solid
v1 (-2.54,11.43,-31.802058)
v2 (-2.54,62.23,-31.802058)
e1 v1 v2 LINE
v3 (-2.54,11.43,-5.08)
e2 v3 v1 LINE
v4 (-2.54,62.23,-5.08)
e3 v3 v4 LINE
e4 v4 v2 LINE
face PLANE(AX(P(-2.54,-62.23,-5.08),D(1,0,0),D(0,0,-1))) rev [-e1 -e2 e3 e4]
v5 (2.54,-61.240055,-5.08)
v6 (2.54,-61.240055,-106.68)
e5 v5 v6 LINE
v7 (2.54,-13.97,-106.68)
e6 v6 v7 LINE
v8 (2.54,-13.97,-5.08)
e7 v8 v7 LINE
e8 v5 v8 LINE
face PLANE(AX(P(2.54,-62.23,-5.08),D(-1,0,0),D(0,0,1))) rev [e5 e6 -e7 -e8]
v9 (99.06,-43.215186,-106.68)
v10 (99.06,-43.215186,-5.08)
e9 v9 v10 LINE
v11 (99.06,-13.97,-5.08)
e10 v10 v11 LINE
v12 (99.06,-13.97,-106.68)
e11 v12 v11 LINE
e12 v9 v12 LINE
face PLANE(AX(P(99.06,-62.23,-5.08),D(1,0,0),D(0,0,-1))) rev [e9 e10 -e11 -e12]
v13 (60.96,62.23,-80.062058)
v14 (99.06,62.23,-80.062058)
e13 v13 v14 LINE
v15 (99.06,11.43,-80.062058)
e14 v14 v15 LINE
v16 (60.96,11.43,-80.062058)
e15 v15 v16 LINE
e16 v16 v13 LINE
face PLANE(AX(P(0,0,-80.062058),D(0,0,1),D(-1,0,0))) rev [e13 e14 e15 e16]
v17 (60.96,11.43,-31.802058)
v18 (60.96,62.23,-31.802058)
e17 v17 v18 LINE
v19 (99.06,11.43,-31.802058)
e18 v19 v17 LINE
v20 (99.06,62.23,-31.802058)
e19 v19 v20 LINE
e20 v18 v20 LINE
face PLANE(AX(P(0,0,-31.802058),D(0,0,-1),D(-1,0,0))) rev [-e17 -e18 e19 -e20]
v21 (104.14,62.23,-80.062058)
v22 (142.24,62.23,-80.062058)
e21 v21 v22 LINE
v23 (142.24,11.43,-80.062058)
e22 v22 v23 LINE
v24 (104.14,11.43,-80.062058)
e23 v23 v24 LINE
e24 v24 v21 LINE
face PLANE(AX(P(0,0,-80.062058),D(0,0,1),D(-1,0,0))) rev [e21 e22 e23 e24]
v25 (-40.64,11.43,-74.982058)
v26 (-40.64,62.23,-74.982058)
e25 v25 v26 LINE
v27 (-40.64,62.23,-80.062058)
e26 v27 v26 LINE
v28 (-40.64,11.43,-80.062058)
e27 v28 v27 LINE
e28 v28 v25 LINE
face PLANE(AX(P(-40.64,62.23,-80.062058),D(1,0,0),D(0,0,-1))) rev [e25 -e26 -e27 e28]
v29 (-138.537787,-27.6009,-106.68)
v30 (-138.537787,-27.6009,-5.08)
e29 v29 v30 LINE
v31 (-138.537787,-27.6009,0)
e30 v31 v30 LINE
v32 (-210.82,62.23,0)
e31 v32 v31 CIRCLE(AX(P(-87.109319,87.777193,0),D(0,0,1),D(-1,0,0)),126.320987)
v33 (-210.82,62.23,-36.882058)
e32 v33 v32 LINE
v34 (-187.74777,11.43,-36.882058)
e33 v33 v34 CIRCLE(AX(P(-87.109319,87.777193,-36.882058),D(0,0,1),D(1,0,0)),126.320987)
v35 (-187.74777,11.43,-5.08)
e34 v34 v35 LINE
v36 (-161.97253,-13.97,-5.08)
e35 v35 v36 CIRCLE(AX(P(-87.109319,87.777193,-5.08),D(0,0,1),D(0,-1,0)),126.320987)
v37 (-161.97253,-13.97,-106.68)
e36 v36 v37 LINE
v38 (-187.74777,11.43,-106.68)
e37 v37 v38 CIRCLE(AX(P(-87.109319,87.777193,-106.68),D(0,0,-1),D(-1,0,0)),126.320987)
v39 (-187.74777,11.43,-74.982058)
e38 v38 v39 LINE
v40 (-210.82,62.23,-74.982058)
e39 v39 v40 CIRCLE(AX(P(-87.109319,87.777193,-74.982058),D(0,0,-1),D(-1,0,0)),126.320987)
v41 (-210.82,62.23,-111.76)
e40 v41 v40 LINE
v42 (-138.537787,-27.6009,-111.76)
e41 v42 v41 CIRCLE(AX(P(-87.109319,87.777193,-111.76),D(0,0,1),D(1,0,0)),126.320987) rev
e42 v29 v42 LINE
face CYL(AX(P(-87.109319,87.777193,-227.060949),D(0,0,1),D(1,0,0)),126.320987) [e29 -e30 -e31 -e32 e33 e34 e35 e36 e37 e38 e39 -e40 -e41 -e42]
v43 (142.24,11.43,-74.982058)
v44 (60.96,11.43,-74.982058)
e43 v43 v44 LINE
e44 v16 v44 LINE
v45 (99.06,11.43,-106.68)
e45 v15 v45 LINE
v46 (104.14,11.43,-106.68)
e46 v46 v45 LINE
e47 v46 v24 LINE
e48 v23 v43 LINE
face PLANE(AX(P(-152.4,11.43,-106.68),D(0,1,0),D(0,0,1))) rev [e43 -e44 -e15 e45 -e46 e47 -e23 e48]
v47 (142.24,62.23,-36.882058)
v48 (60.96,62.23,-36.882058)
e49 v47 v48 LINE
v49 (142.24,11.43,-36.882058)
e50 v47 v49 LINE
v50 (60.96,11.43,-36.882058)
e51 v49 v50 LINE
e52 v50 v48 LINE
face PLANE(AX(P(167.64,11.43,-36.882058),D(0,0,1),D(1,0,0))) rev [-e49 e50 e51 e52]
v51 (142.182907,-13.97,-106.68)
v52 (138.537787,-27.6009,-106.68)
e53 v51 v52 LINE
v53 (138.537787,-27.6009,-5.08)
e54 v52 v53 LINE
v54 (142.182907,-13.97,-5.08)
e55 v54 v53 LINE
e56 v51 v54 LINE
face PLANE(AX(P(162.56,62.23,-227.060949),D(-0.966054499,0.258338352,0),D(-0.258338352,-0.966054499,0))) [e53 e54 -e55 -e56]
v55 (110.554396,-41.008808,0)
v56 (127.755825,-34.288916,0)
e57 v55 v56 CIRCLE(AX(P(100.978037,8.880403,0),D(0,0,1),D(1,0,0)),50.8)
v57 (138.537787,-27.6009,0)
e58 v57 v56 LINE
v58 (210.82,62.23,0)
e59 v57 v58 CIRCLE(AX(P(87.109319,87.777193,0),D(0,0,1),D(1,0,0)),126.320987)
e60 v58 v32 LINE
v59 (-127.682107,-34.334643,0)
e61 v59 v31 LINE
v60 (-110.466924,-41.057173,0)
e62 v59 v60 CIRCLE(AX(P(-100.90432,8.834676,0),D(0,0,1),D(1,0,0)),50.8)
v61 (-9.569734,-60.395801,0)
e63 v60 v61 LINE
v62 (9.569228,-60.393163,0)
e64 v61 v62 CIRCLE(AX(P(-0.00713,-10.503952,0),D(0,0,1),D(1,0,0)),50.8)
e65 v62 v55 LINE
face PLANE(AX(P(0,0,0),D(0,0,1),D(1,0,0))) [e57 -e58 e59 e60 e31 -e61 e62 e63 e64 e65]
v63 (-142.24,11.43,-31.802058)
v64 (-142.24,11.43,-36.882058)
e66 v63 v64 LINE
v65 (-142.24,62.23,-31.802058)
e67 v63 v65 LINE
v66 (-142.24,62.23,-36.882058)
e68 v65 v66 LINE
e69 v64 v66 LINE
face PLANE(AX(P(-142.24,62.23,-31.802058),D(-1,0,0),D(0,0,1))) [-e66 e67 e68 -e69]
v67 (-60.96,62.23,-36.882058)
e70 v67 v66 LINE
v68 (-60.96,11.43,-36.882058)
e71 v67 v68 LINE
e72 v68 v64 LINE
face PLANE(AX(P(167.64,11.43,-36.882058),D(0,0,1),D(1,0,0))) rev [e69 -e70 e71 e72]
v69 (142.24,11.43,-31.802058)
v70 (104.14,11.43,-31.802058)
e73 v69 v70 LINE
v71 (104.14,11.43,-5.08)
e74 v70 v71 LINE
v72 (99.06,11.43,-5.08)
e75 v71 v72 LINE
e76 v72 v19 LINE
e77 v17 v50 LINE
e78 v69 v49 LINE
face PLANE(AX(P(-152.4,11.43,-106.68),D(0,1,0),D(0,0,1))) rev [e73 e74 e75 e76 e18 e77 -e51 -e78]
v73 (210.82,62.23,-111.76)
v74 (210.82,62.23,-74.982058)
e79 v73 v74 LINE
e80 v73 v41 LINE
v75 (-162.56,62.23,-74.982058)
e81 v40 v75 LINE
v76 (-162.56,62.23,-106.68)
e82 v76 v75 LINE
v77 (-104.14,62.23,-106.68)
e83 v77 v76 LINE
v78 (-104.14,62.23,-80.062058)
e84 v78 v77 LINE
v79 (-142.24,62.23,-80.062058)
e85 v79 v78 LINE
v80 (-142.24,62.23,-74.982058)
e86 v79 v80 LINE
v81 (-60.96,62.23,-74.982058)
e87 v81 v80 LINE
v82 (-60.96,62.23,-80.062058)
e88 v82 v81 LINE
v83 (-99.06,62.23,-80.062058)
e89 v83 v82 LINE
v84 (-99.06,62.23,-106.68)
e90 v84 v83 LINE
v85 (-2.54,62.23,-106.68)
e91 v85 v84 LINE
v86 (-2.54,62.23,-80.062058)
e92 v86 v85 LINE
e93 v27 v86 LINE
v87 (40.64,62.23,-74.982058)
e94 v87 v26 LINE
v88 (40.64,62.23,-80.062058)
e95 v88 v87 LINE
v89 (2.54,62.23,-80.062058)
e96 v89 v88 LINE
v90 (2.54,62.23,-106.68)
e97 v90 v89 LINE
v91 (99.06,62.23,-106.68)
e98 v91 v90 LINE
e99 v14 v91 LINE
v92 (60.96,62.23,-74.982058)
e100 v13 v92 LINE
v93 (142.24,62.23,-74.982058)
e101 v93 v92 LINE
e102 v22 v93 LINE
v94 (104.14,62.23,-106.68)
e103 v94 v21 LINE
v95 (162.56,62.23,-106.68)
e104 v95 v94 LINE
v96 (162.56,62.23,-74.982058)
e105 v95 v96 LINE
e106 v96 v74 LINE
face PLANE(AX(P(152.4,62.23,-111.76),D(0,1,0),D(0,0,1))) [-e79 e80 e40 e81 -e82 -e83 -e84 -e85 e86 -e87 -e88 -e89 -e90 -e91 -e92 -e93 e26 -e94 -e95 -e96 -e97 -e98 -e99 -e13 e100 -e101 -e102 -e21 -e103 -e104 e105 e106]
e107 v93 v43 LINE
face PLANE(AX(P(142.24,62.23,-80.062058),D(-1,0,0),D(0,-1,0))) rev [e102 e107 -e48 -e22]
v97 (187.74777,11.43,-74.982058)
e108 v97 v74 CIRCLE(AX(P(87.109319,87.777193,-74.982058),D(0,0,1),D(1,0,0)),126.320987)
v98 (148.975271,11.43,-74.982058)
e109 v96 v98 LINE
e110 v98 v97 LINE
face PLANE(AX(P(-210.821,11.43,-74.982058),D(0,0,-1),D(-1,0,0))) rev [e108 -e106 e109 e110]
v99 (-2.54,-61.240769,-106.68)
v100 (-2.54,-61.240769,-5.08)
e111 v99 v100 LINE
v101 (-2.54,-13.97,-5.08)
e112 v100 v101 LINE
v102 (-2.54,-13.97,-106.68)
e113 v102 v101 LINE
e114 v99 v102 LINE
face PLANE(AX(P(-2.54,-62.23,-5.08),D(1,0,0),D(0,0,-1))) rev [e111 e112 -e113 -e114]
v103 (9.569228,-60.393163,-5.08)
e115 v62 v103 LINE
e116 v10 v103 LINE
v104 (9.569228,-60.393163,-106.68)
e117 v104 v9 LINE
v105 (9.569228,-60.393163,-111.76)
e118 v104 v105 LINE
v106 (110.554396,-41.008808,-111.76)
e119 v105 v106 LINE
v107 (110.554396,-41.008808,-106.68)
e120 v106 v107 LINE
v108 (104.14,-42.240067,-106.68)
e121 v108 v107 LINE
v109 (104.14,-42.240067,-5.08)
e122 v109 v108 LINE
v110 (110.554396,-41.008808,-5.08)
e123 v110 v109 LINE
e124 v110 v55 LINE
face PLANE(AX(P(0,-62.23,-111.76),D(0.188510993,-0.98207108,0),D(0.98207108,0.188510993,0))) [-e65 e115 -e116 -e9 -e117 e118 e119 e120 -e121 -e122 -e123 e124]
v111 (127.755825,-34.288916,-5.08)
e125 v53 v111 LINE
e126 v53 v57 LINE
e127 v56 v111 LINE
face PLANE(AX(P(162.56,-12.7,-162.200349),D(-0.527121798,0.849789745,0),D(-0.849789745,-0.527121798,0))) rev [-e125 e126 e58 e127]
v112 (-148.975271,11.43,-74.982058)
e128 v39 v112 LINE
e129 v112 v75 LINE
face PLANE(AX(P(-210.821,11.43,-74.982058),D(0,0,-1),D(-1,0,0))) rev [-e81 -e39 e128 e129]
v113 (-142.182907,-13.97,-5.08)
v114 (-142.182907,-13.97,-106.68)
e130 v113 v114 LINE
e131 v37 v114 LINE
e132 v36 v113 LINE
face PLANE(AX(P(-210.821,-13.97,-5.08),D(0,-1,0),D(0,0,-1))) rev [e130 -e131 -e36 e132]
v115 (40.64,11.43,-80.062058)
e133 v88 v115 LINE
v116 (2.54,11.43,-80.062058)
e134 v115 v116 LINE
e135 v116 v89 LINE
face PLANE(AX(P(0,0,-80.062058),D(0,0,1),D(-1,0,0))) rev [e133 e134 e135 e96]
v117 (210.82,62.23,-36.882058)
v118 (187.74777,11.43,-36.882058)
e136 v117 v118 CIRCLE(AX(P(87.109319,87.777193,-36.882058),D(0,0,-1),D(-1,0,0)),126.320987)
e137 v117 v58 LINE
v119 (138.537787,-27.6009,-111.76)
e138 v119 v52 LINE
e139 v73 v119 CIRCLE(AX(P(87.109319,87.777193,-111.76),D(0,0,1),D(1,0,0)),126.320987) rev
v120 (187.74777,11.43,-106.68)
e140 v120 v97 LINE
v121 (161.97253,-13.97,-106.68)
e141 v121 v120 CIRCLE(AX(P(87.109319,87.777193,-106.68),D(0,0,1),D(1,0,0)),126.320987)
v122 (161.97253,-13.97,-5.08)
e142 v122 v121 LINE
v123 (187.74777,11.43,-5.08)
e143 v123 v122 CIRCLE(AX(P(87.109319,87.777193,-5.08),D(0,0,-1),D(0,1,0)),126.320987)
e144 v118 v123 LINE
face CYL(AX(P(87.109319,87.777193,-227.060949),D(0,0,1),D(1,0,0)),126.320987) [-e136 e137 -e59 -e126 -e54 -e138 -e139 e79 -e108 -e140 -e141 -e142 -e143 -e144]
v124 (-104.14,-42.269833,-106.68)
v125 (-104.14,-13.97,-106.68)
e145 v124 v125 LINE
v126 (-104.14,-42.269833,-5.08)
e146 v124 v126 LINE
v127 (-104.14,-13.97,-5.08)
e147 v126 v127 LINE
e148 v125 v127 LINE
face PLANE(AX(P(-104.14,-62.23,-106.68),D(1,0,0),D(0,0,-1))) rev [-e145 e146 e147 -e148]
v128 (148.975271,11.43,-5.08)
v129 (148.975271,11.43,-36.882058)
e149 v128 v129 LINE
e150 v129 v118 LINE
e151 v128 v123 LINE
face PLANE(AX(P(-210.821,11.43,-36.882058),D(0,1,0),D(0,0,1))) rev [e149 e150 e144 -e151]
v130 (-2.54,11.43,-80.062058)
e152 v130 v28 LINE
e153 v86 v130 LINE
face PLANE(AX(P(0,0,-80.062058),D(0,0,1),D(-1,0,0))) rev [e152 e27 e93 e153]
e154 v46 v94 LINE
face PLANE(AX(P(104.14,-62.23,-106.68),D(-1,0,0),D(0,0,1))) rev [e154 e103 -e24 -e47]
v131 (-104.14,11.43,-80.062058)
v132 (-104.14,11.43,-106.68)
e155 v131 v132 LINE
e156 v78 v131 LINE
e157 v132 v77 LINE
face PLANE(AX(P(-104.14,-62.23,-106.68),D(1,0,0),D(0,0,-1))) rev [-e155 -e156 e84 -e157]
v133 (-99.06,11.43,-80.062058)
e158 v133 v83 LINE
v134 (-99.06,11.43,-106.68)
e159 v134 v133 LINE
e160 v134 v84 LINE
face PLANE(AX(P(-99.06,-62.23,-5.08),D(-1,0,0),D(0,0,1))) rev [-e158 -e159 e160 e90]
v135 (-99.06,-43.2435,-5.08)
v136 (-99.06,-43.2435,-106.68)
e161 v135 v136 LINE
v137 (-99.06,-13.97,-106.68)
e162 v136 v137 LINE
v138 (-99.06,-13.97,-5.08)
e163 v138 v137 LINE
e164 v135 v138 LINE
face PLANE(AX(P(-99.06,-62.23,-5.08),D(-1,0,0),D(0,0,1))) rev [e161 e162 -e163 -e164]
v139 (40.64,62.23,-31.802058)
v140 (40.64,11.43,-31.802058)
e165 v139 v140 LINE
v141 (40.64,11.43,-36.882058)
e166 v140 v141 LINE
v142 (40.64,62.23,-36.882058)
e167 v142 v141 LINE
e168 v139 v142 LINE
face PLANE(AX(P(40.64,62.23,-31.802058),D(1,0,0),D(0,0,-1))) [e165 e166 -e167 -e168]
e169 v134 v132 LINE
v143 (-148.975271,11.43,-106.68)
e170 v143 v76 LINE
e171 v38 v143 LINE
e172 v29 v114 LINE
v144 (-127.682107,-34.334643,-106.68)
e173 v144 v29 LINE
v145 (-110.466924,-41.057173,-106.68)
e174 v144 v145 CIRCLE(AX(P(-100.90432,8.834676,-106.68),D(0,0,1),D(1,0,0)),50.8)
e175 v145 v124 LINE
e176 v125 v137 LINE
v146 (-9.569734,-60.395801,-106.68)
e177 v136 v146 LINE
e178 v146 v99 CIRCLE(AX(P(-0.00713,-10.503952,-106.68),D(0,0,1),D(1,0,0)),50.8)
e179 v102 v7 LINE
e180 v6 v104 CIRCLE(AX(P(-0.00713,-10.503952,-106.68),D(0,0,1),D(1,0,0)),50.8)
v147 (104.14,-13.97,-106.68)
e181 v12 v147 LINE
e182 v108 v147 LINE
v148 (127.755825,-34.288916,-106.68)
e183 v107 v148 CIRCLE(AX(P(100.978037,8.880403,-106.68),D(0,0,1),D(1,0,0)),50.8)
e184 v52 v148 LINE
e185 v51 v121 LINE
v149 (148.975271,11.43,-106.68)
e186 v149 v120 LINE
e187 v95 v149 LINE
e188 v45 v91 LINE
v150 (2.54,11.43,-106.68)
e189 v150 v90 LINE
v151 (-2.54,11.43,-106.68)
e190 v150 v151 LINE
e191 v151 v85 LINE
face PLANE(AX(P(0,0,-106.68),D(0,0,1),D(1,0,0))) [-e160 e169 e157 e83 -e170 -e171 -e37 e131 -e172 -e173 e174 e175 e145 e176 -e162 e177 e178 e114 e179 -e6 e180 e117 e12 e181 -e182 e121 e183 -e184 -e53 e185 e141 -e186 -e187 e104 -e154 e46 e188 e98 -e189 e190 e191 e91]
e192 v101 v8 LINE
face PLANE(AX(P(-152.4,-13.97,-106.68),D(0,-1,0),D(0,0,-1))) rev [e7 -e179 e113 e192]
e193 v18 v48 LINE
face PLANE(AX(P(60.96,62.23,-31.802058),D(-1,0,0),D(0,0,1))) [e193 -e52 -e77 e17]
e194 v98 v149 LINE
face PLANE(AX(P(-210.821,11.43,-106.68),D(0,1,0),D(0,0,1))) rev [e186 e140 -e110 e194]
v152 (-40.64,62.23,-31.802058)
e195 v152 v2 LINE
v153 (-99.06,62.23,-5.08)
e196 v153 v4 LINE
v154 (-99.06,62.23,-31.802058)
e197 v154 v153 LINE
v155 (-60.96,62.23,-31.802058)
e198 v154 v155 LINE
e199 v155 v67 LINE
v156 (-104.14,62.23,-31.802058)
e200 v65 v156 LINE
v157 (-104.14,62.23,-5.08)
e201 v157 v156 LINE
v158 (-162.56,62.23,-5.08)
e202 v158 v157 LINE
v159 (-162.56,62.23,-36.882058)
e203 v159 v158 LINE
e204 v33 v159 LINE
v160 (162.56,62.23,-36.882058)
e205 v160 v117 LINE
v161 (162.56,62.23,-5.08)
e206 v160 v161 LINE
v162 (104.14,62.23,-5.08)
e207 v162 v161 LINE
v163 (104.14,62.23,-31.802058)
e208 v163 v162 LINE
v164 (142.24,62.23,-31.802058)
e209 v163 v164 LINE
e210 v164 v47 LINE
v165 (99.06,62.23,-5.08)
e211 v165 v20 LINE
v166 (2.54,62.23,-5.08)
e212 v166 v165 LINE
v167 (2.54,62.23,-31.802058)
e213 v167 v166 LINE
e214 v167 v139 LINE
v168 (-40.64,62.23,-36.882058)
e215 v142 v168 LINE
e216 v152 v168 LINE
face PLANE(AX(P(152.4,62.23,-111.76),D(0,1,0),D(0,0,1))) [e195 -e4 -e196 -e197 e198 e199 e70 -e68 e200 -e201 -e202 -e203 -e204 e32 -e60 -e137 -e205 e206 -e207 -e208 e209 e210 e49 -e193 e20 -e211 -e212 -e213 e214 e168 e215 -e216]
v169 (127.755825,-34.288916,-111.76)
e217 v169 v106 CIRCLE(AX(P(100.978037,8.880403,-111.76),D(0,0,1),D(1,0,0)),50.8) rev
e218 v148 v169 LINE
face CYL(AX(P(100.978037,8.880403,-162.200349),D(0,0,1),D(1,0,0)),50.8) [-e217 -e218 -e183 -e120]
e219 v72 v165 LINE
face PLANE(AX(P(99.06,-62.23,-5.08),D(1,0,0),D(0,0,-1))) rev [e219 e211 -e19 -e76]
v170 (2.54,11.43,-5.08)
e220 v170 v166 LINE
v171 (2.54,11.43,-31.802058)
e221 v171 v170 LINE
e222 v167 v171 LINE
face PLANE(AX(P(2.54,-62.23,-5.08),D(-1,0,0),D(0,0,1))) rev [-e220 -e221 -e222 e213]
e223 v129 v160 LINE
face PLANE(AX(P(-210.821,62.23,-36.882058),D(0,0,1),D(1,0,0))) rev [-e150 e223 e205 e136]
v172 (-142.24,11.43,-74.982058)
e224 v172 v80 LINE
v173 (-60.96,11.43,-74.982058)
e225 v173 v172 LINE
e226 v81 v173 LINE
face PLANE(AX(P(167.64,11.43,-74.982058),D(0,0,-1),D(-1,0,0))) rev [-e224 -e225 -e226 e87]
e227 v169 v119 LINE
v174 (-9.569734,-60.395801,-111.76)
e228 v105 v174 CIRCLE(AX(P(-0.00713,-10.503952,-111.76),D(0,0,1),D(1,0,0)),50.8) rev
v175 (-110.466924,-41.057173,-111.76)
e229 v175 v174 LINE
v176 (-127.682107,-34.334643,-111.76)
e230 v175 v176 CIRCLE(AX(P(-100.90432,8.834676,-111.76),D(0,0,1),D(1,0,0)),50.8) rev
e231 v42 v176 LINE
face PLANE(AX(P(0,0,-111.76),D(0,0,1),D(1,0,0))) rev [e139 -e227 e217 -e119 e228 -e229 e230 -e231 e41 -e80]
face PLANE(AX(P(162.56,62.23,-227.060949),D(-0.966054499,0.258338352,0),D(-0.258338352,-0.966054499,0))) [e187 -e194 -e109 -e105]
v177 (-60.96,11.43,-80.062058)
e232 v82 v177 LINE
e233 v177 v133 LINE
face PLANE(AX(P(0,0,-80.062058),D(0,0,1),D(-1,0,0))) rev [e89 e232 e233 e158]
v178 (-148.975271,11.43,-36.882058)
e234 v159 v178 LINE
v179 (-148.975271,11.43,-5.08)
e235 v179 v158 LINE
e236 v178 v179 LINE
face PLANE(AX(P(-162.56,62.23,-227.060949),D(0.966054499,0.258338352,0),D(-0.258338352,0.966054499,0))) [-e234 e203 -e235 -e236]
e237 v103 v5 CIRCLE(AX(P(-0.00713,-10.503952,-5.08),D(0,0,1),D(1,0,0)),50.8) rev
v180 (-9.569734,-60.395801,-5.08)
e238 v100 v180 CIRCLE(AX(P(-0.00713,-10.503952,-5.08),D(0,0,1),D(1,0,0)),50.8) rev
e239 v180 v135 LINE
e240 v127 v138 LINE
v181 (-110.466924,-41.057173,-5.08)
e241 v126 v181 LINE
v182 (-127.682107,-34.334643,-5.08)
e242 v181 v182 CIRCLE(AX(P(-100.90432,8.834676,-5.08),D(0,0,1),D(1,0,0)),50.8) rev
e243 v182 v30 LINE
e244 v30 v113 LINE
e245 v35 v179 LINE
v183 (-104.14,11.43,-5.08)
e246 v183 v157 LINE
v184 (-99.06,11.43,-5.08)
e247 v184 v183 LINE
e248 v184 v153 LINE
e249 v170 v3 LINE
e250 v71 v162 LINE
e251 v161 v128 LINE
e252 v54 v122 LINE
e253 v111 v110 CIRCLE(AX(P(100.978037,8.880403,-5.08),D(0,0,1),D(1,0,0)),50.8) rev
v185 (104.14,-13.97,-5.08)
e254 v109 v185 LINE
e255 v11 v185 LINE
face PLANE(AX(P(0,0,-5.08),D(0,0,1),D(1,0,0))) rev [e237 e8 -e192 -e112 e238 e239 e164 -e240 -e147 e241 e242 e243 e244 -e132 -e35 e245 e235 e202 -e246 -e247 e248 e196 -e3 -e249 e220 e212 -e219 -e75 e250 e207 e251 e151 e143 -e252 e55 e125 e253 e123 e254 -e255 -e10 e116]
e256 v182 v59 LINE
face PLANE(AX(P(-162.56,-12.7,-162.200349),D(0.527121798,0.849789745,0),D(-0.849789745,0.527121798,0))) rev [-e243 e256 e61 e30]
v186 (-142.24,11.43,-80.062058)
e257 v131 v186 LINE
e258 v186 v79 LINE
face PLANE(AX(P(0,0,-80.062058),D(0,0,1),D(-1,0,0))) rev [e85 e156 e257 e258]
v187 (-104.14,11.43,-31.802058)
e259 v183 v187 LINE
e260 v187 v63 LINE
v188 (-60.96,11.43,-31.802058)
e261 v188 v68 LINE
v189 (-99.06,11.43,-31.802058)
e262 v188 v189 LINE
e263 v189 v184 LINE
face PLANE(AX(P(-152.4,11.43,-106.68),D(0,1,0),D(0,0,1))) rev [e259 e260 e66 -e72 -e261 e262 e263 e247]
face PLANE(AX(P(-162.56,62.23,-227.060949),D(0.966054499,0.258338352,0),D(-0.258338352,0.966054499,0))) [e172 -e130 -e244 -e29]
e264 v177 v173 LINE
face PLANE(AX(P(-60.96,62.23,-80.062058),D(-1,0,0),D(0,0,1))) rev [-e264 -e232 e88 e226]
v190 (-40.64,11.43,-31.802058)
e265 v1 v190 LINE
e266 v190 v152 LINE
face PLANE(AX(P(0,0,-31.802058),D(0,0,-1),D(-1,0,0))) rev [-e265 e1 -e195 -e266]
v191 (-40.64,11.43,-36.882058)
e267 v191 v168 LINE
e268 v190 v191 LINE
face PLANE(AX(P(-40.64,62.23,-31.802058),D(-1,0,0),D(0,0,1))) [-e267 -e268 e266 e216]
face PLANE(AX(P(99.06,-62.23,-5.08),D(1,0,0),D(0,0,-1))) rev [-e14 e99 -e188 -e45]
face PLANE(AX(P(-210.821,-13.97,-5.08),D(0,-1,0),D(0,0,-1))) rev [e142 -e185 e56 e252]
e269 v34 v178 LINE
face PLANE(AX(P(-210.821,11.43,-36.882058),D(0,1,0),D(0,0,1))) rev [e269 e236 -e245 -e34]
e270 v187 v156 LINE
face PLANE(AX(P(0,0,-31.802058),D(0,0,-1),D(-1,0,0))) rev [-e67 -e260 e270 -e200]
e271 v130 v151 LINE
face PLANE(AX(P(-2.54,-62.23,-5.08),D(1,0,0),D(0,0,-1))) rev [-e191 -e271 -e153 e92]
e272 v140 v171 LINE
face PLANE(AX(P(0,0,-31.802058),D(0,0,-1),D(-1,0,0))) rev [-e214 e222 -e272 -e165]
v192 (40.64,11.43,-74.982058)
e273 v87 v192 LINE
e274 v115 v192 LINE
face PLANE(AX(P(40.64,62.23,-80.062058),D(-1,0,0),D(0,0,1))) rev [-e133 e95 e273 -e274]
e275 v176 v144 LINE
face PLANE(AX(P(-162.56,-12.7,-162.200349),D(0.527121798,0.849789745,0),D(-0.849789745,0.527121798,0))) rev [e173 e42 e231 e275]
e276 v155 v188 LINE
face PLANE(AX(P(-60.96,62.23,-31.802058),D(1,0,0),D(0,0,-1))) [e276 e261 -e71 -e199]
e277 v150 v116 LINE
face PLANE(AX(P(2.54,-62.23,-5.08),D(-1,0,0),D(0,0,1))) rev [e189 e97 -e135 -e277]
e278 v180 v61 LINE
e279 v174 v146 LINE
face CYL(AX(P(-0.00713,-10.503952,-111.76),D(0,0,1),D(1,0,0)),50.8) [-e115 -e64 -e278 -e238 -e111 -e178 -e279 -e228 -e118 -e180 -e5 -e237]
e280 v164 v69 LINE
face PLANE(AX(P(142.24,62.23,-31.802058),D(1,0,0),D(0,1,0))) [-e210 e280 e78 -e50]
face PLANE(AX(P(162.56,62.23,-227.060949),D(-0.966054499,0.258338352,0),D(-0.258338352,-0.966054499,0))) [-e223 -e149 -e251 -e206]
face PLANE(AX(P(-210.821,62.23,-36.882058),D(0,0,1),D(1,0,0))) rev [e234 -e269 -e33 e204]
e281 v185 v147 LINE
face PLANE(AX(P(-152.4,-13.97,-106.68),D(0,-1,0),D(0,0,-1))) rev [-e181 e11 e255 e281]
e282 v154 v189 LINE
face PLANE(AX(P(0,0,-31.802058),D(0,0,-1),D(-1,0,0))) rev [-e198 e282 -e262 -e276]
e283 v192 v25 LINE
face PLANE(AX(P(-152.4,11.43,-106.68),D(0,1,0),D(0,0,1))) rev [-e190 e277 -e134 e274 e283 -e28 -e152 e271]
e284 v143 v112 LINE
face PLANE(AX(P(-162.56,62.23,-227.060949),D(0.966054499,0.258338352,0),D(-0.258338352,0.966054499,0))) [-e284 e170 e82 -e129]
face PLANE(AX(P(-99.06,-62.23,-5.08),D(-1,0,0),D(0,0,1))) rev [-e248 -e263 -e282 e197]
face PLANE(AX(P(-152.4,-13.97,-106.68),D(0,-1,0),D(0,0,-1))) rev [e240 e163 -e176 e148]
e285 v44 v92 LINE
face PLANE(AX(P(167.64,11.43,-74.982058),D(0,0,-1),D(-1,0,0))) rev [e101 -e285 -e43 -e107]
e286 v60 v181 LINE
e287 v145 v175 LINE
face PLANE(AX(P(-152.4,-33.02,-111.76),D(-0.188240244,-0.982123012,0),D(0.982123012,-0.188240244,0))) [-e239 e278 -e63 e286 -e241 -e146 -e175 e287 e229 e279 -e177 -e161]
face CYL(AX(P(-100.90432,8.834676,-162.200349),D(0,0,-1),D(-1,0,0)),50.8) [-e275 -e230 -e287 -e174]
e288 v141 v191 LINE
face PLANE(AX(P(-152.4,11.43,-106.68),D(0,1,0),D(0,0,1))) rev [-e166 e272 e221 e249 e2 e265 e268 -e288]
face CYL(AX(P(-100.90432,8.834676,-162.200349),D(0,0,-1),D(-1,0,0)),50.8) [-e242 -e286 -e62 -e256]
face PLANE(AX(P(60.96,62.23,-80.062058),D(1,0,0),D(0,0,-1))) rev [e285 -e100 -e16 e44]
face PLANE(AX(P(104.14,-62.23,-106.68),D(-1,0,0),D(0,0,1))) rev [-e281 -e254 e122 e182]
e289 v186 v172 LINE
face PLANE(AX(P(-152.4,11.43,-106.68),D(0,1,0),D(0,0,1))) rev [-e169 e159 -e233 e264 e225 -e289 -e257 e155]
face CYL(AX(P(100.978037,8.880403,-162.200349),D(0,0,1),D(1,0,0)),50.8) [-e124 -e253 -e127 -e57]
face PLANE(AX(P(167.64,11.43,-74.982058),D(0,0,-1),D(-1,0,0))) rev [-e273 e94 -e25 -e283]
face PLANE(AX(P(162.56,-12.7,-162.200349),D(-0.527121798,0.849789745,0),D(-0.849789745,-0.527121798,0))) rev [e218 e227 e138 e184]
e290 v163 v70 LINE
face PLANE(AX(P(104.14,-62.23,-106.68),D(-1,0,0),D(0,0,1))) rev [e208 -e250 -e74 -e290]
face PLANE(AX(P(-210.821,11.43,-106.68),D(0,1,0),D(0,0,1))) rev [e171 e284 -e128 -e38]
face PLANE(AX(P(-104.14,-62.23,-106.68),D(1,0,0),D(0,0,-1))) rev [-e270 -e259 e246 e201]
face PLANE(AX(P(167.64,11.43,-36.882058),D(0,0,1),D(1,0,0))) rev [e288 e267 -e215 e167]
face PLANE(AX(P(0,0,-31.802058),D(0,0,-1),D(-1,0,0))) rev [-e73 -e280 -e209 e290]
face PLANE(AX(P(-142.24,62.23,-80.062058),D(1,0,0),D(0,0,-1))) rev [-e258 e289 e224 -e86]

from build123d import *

# Parameters (mm, degrees)
BOSS_EXTRUDE1_DEPTH                 = 111.76
SKETCH5_W                           = 304.8
SKETCH5_H                           = 25.4
CUT_EXTRUDE3_DEPTH                  = 101.6
CUT_EXTRUDE4_DEPTH                  = 227.288199427
CUT_EXTRUDE4_DEPTH_BACK             = 227.288199427
SKETCH3_W                           = 96.52
SKETCH3_H                           = 101.6
SKETCH3_W_2                         = 48.26
CUT_EXTRUDE5_REACH                  = 288.663
SKETCH6_W                           = 38.1
SKETCH6_H                           = 50.8
SKETCH7_W                           = 81.28
SKETCH7_H                           = 50.8
BOSS_EXTRUDE2_DEPTH                 = 5.08
SKETCH9_W                           = 5.08
SKETCH9_H                           = 95.25
BOSS_EXTRUDE3_DEPTH                 = 10.16
SKETCH10_W                          = 5.08
SKETCH10_H                          = 95.206439839
BOSS_EXTRUDE4_DEPTH                 = 10.16
CUT_EXTRUDE7_REACH                  = 208.854
FILLET1_R                           = 50.8
BOSS_EXTRUDE5_REACH                 = 208.854
CUT_EXTRUDE8_REACH                  = 248.593
CUT_EXTRUDE8_END_RADIUS             = 126.32098656
CUT_EXTRUDE8_DIRECTION_2_REACH      = 248.593
CUT_EXTRUDE8_DIRECTION_2_END_RADIUS = 126.32098656


with BuildPart() as part:
    # Sketch1 → Boss-Extrude1 (new body)
    with BuildSketch(Plane.XY):
        Polygon((-152.4, 62.23), (-152.4, -33.02), (0, -62.23), (152.4, -32.976439839), (152.4, 62.23), align=None)
    extrude(amount=-BOSS_EXTRUDE1_DEPTH)

    # Sketch5 → Cut-Extrude3 (cut)
    with BuildSketch(Plane.XY.offset(-5.08)):
        with Locations((0, -1.27)):
            Rectangle(SKETCH5_W, SKETCH5_H)
    extrude(amount=-CUT_EXTRUDE3_DEPTH, mode=Mode.SUBTRACT)

    # Sketch3 → Cut-Extrude4 (cut, two sides: drawn at the far end of the back side and taken through both)
    with BuildSketch(Plane(origin=(0, 62.23, 0), x_dir=(1, 0, 0), z_dir=(0, 1, 0)).offset(-CUT_EXTRUDE4_DEPTH_BACK)):
        with Locations((-50.8, 55.88)):
            Rectangle(SKETCH3_W, SKETCH3_H)
        with Locations((50.8, 55.88)):
            Rectangle(SKETCH3_W, SKETCH3_H)
        with Locations((-128.27, 55.88)):
            Rectangle(SKETCH3_W_2, SKETCH3_H)
        with Locations((128.27, 55.88)):
            Rectangle(SKETCH3_W_2, SKETCH3_H)
    extrude(amount=CUT_EXTRUDE4_DEPTH + CUT_EXTRUDE4_DEPTH_BACK, mode=Mode.SUBTRACT)

    # Cut-Extrude5: up to this face of the body (flat: up to its plane)
    cut_extrude5_end = Plane(part.part.faces().sort_by_distance((104.14, 36.83, -55.88))[0])
    # Sketch6 → Cut-Extrude5 (cut, up to the picked face)
    with BuildSketch(Plane.ZY.offset(104.14), mode=Mode.PRIVATE) as cut_extrude5_sk1:
        with Locations((-55.932057734, 36.83)):
            Rectangle(SKETCH6_W, SKETCH6_H)
    cut_extrude5_tool1 = split(extrude(cut_extrude5_sk1.sketch, amount=-CUT_EXTRUDE5_REACH, mode=Mode.PRIVATE), bisect_by=cut_extrude5_end, keep=Keep.BOTH, mode=Mode.PRIVATE)
    add(cut_extrude5_tool1.solids().sort_by(Axis((-104.14, 36.83, -55.932058), (1, 0, 0)))[0], mode=Mode.SUBTRACT)

    # Sketch7 → Boss-Extrude2 (add)
    with BuildSketch(Plane(origin=(0, 0, -36.882057734), x_dir=(-1, 0, 0), z_dir=(0, 0, -1))):
        with Locations((0, 36.83)):
            Rectangle(SKETCH7_W, SKETCH7_H)
        with Locations((101.6, 36.83)):
            Rectangle(SKETCH7_W, SKETCH7_H)
        with Locations((-101.6, 36.83)):
            Rectangle(SKETCH7_W, SKETCH7_H)
    boss_extrude2 = extrude(amount=-BOSS_EXTRUDE2_DEPTH)

    # Mirror1: Boss-Extrude2 across plane
    add(boss_extrude2.mirror(Plane(origin=(0, 0, -55.932057734), x_dir=(1, 0, 0), z_dir=(0, 0, -1))))

    # Sketch9 → Boss-Extrude3 (add)
    with BuildSketch(Plane.ZY.offset(152.4)):
        with Locations((-109.22, 14.605)):
            Rectangle(SKETCH9_W, SKETCH9_H)
        with Locations((-2.54, 14.605)):
            Rectangle(SKETCH9_W, SKETCH9_H)
    extrude(amount=BOSS_EXTRUDE3_DEPTH)

    # Sketch10 → Boss-Extrude4 (add)
    with BuildSketch(Plane(origin=(152.4, 0, 0), x_dir=(0, 0, -1), z_dir=(1, 0, 0))):
        with Locations((2.54, 14.626780081)):
            Rectangle(SKETCH10_W, SKETCH10_H)
        with Locations((109.22, 14.626780081)):
            Rectangle(SKETCH10_W, SKETCH10_H)
    extrude(amount=BOSS_EXTRUDE4_DEPTH)

    # Cut-Extrude7: up to this face of the body (flat: up to its plane)
    cut_extrude7_end = Plane(part.part.faces().sort_by_distance((-0.011490312, 7.400814094, -111.76))[0])
    # Sketch11 → Cut-Extrude7 (cut, up to the picked face)
    with BuildSketch(Plane.XY, mode=Mode.PRIVATE) as cut_extrude7_sk1:
        Polygon((-162.56, -12.7), (-119.696308585, -39.288207521), (-152.4, -33.02), (-162.56, -33.02), align=None)
    cut_extrude7_tool1 = split(extrude(cut_extrude7_sk1.sketch, amount=-CUT_EXTRUDE7_REACH, mode=Mode.PRIVATE), bisect_by=cut_extrude7_end, keep=Keep.BOTH, mode=Mode.PRIVATE)
    # Sketch11 → Cut-Extrude7 (cut, up to the picked face)
    with BuildSketch(Plane.XY, mode=Mode.PRIVATE) as cut_extrude7_sk2:
        Polygon((152.4, -33.02), (162.56, -33.02), (162.56, -12.7), (119.696308585, -39.288207521), align=None)
    cut_extrude7_tool2 = split(extrude(cut_extrude7_sk2.sketch, amount=-CUT_EXTRUDE7_REACH, mode=Mode.PRIVATE), bisect_by=cut_extrude7_end, keep=Keep.BOTH, mode=Mode.PRIVATE)
    add(cut_extrude7_tool1.solids().sort_by(Axis((-148.539263, -27.801749, 0), (0, 0, -1)))[0], mode=Mode.SUBTRACT)
    add(cut_extrude7_tool2.solids().sort_by(Axis((148.539263, -27.801749, 0), (0, 0, -1)))[0], mode=Mode.SUBTRACT)

    # Fillet1
    # the kernel refuses this fillet: 50.8 mm, written as the material it takes off along each edge
    with BuildSketch(Plane(origin=(-162.56, -12.7, 70.671047804), x_dir=(0.8497897447130388, -0.5271217978613181, 0), z_dir=(0, 0, -1)), Plane(origin=(-162.56, -12.7, -36.008952196), x_dir=(0.8497897447130388, -0.5271217978613181, 0), z_dir=(0, 0, -1)), Plane(origin=(162.56, -12.7, 70.671047804), x_dir=(0, 1, 0), z_dir=(0, 0, -1))) as fillet1_piece_1:
        with BuildLine():
            CenterArc((FILLET1_R * 0.556464943335, -FILLET1_R), FILLET1_R, 90, 58.188808221)
            Line((-FILLET1_R * 0.293324801378, -FILLET1_R * 0.472878202139), (0, 0))
            Line((0, 0), (FILLET1_R * 0.556464943335, 0))
        make_face()
    extrude(amount=146.422095607, mode=Mode.SUBTRACT)
    with BuildSketch(Plane(origin=(-119.696308585, -39.288207521, -83.186546401), x_dir=(0.9821230119270369, -0.18824024395268216, 0), z_dir=(0, 0, -1)), Plane(origin=(-119.696308585, -39.288207521, 23.493453599), x_dir=(0.9821230119270369, -0.18824024395268216, 0), z_dir=(0, 0, -1))) as fillet1_piece_2:
        with BuildLine():
            CenterArc((FILLET1_R * 0.184987823618, -FILLET1_R), FILLET1_R, 90, 20.961087149)
            Line((-FILLET1_R * 0.172745995297, -FILLET1_R * 0.0661764005955), (0, 0))
            Line((0, 0), (FILLET1_R * 0.184987823618, 0))
        make_face()
    extrude(amount=52.066907199, mode=Mode.SUBTRACT)
    with BuildSketch(Plane(origin=(162.56, -12.7, -36.008952196), x_dir=(-0.8497897447130388, -0.5271217978613181, 0), z_dir=(0, 0, -1))) as fillet1_piece_3:
        with BuildLine():
            CenterArc((FILLET1_R * 0.556464943335, FILLET1_R), FILLET1_R, 211.811191779, 58.188808221)
            Line((-FILLET1_R * 0.293324801378, FILLET1_R * 0.472878202139), (0, 0))
            Line((0, 0), (FILLET1_R * 0.556464943335, 0))
        make_face()
    extrude(amount=146.422095607, mode=Mode.SUBTRACT)
    with BuildSketch(Plane(origin=(119.776180176, -39.238663434, 23.475348992), x_dir=(-0.9820710795721669, -0.18851099349363817, 0), z_dir=(0, 0, -1)), Plane(origin=(119.776180176, -39.238663434, -83.204651008), x_dir=(-0.9820710795721669, -0.18851099349363817, 0), z_dir=(0, 0, -1))) as fillet1_piece_4:
        with BuildLine():
            CenterArc((FILLET1_R * 0.184845267653, FILLET1_R), FILLET1_R, 249.054708445, 20.945291555)
            Line((-FILLET1_R * 0.172631096402, FILLET1_R * 0.0660778141933), (0, 0))
            Line((0, 0), (FILLET1_R * 0.184845267653, 0))
        make_face()
    extrude(amount=52.030697984, mode=Mode.SUBTRACT)
    with BuildSketch(Plane(origin=(0, -62.23, 24.359816254), x_dir=(-0.982123011927037, 0.1882402439526816, 0), z_dir=(0, 0, -1))) as fillet1_piece_5:
        with BuildLine():
            CenterArc((FILLET1_R * 0.191809576801, FILLET1_R), FILLET1_R, 248.283995147, 21.716004853)
            Line((-FILLET1_R * 0.178196707507, FILLET1_R * 0.0709707488072), (0, 0))
            Line((0, 0), (FILLET1_R * 0.191809576801, 0))
        make_face()
    extrude(amount=160.479632508, mode=Mode.SUBTRACT)

    # Boss-Extrude5: up to this face of the body (flat: up to its plane)
    boss_extrude5_end = Plane(part.part.faces().sort_by_distance((-0.004732582, 8.379000895, -111.76))[0])
    # Sketch12 → Boss-Extrude5 (add, up to the picked face)
    with BuildSketch(Plane.XY, mode=Mode.PRIVATE) as boss_extrude5_sk1:
        with BuildLine():
            Line((-162.56, 62.23), (-210.82, 62.23))
            ThreePointArc((-210.82, 62.23), (-185.525923559, 8.586514121), (-138.537787331, -27.60089991))
            Line((-138.537787331, -27.60089991), (-162.56, 62.23))
        make_face()
    boss_extrude5_tool1 = split(extrude(boss_extrude5_sk1.sketch, amount=-BOSS_EXTRUDE5_REACH, mode=Mode.PRIVATE), bisect_by=boss_extrude5_end, keep=Keep.BOTH, mode=Mode.PRIVATE)
    # Sketch12 → Boss-Extrude5 (add, up to the picked face)
    with BuildSketch(Plane.XY, mode=Mode.PRIVATE) as boss_extrude5_sk2:
        with BuildLine():
            Line((162.56, 62.23), (210.82, 62.23))
            ThreePointArc((210.82, 62.23), (185.525923559, 8.586514121), (138.537787331, -27.60089991))
            Line((138.537787331, -27.60089991), (162.56, 62.23))
        make_face()
    boss_extrude5_tool2 = split(extrude(boss_extrude5_sk2.sketch, amount=-BOSS_EXTRUDE5_REACH, mode=Mode.PRIVATE), bisect_by=boss_extrude5_end, keep=Keep.BOTH, mode=Mode.PRIVATE)
    add(boss_extrude5_tool1.solids().sort_by(Axis((-173.436994, 26.131053, 0), (0, 0, -1)))[0])
    add(boss_extrude5_tool2.solids().sort_by(Axis((173.436994, 26.131053, 0), (0, 0, -1)))[0])

    # Cut-Extrude8: up to this cylinder (the profile starts inside it)
    cut_extrude8_end = Plane(origin=(-87.109319049, 87.777192878, -55.90231), z_dir=(0, 0, 1)) * Cylinder(CUT_EXTRUDE8_END_RADIUS, 750.827973119, mode=Mode.PRIVATE)
    # Sketch13 → Cut-Extrude8 (cut, up to the surface)
    with BuildSketch(Plane(origin=(0, 0, 0), x_dir=(0, 0, -1), z_dir=(1, 0, 0)), mode=Mode.PRIVATE) as cut_extrude8_sk1:
        Polygon((36.882057734, 62.23), (36.882057734, 11.43), (5.08, 11.43), (5.08, -13.97), (106.68, -13.97), (106.68, 11.43), (74.982057734, 11.43), (74.982057734, 62.23), align=None)
    cut_extrude8_tool1 = extrude(cut_extrude8_sk1.sketch, amount=-CUT_EXTRUDE8_REACH, mode=Mode.PRIVATE) & cut_extrude8_end
    add(cut_extrude8_tool1.solids().sort_by_distance((0, 15.058571, -55.90231))[0], mode=Mode.SUBTRACT)

    # Cut-Extrude8 direction 2: up to this cylinder (the profile starts inside it)
    cut_extrude8_direction_2_end = Plane(origin=(87.109319049, 87.777192878, -55.90231), z_dir=(0, 0, 1)) * Cylinder(CUT_EXTRUDE8_DIRECTION_2_END_RADIUS, 750.827973119, mode=Mode.PRIVATE)
    # Sketch13 → Cut-Extrude8 direction 2 (cut, up to the surface)
    with BuildSketch(Plane(origin=(0, 0, 0), x_dir=(0, 0, -1), z_dir=(1, 0, 0)), mode=Mode.PRIVATE) as cut_extrude8_direction_2_sk1:
        Polygon((36.882057734, 62.23), (36.882057734, 11.43), (5.08, 11.43), (5.08, -13.97), (106.68, -13.97), (106.68, 11.43), (74.982057734, 11.43), (74.982057734, 62.23), align=None)
    cut_extrude8_direction_2_tool1 = extrude(cut_extrude8_direction_2_sk1.sketch, amount=CUT_EXTRUDE8_DIRECTION_2_REACH, mode=Mode.PRIVATE) & cut_extrude8_direction_2_end
    add(cut_extrude8_direction_2_tool1.solids().sort_by_distance((0, 15.058571, -55.90231))[0], mode=Mode.SUBTRACT)


solid = part.part
